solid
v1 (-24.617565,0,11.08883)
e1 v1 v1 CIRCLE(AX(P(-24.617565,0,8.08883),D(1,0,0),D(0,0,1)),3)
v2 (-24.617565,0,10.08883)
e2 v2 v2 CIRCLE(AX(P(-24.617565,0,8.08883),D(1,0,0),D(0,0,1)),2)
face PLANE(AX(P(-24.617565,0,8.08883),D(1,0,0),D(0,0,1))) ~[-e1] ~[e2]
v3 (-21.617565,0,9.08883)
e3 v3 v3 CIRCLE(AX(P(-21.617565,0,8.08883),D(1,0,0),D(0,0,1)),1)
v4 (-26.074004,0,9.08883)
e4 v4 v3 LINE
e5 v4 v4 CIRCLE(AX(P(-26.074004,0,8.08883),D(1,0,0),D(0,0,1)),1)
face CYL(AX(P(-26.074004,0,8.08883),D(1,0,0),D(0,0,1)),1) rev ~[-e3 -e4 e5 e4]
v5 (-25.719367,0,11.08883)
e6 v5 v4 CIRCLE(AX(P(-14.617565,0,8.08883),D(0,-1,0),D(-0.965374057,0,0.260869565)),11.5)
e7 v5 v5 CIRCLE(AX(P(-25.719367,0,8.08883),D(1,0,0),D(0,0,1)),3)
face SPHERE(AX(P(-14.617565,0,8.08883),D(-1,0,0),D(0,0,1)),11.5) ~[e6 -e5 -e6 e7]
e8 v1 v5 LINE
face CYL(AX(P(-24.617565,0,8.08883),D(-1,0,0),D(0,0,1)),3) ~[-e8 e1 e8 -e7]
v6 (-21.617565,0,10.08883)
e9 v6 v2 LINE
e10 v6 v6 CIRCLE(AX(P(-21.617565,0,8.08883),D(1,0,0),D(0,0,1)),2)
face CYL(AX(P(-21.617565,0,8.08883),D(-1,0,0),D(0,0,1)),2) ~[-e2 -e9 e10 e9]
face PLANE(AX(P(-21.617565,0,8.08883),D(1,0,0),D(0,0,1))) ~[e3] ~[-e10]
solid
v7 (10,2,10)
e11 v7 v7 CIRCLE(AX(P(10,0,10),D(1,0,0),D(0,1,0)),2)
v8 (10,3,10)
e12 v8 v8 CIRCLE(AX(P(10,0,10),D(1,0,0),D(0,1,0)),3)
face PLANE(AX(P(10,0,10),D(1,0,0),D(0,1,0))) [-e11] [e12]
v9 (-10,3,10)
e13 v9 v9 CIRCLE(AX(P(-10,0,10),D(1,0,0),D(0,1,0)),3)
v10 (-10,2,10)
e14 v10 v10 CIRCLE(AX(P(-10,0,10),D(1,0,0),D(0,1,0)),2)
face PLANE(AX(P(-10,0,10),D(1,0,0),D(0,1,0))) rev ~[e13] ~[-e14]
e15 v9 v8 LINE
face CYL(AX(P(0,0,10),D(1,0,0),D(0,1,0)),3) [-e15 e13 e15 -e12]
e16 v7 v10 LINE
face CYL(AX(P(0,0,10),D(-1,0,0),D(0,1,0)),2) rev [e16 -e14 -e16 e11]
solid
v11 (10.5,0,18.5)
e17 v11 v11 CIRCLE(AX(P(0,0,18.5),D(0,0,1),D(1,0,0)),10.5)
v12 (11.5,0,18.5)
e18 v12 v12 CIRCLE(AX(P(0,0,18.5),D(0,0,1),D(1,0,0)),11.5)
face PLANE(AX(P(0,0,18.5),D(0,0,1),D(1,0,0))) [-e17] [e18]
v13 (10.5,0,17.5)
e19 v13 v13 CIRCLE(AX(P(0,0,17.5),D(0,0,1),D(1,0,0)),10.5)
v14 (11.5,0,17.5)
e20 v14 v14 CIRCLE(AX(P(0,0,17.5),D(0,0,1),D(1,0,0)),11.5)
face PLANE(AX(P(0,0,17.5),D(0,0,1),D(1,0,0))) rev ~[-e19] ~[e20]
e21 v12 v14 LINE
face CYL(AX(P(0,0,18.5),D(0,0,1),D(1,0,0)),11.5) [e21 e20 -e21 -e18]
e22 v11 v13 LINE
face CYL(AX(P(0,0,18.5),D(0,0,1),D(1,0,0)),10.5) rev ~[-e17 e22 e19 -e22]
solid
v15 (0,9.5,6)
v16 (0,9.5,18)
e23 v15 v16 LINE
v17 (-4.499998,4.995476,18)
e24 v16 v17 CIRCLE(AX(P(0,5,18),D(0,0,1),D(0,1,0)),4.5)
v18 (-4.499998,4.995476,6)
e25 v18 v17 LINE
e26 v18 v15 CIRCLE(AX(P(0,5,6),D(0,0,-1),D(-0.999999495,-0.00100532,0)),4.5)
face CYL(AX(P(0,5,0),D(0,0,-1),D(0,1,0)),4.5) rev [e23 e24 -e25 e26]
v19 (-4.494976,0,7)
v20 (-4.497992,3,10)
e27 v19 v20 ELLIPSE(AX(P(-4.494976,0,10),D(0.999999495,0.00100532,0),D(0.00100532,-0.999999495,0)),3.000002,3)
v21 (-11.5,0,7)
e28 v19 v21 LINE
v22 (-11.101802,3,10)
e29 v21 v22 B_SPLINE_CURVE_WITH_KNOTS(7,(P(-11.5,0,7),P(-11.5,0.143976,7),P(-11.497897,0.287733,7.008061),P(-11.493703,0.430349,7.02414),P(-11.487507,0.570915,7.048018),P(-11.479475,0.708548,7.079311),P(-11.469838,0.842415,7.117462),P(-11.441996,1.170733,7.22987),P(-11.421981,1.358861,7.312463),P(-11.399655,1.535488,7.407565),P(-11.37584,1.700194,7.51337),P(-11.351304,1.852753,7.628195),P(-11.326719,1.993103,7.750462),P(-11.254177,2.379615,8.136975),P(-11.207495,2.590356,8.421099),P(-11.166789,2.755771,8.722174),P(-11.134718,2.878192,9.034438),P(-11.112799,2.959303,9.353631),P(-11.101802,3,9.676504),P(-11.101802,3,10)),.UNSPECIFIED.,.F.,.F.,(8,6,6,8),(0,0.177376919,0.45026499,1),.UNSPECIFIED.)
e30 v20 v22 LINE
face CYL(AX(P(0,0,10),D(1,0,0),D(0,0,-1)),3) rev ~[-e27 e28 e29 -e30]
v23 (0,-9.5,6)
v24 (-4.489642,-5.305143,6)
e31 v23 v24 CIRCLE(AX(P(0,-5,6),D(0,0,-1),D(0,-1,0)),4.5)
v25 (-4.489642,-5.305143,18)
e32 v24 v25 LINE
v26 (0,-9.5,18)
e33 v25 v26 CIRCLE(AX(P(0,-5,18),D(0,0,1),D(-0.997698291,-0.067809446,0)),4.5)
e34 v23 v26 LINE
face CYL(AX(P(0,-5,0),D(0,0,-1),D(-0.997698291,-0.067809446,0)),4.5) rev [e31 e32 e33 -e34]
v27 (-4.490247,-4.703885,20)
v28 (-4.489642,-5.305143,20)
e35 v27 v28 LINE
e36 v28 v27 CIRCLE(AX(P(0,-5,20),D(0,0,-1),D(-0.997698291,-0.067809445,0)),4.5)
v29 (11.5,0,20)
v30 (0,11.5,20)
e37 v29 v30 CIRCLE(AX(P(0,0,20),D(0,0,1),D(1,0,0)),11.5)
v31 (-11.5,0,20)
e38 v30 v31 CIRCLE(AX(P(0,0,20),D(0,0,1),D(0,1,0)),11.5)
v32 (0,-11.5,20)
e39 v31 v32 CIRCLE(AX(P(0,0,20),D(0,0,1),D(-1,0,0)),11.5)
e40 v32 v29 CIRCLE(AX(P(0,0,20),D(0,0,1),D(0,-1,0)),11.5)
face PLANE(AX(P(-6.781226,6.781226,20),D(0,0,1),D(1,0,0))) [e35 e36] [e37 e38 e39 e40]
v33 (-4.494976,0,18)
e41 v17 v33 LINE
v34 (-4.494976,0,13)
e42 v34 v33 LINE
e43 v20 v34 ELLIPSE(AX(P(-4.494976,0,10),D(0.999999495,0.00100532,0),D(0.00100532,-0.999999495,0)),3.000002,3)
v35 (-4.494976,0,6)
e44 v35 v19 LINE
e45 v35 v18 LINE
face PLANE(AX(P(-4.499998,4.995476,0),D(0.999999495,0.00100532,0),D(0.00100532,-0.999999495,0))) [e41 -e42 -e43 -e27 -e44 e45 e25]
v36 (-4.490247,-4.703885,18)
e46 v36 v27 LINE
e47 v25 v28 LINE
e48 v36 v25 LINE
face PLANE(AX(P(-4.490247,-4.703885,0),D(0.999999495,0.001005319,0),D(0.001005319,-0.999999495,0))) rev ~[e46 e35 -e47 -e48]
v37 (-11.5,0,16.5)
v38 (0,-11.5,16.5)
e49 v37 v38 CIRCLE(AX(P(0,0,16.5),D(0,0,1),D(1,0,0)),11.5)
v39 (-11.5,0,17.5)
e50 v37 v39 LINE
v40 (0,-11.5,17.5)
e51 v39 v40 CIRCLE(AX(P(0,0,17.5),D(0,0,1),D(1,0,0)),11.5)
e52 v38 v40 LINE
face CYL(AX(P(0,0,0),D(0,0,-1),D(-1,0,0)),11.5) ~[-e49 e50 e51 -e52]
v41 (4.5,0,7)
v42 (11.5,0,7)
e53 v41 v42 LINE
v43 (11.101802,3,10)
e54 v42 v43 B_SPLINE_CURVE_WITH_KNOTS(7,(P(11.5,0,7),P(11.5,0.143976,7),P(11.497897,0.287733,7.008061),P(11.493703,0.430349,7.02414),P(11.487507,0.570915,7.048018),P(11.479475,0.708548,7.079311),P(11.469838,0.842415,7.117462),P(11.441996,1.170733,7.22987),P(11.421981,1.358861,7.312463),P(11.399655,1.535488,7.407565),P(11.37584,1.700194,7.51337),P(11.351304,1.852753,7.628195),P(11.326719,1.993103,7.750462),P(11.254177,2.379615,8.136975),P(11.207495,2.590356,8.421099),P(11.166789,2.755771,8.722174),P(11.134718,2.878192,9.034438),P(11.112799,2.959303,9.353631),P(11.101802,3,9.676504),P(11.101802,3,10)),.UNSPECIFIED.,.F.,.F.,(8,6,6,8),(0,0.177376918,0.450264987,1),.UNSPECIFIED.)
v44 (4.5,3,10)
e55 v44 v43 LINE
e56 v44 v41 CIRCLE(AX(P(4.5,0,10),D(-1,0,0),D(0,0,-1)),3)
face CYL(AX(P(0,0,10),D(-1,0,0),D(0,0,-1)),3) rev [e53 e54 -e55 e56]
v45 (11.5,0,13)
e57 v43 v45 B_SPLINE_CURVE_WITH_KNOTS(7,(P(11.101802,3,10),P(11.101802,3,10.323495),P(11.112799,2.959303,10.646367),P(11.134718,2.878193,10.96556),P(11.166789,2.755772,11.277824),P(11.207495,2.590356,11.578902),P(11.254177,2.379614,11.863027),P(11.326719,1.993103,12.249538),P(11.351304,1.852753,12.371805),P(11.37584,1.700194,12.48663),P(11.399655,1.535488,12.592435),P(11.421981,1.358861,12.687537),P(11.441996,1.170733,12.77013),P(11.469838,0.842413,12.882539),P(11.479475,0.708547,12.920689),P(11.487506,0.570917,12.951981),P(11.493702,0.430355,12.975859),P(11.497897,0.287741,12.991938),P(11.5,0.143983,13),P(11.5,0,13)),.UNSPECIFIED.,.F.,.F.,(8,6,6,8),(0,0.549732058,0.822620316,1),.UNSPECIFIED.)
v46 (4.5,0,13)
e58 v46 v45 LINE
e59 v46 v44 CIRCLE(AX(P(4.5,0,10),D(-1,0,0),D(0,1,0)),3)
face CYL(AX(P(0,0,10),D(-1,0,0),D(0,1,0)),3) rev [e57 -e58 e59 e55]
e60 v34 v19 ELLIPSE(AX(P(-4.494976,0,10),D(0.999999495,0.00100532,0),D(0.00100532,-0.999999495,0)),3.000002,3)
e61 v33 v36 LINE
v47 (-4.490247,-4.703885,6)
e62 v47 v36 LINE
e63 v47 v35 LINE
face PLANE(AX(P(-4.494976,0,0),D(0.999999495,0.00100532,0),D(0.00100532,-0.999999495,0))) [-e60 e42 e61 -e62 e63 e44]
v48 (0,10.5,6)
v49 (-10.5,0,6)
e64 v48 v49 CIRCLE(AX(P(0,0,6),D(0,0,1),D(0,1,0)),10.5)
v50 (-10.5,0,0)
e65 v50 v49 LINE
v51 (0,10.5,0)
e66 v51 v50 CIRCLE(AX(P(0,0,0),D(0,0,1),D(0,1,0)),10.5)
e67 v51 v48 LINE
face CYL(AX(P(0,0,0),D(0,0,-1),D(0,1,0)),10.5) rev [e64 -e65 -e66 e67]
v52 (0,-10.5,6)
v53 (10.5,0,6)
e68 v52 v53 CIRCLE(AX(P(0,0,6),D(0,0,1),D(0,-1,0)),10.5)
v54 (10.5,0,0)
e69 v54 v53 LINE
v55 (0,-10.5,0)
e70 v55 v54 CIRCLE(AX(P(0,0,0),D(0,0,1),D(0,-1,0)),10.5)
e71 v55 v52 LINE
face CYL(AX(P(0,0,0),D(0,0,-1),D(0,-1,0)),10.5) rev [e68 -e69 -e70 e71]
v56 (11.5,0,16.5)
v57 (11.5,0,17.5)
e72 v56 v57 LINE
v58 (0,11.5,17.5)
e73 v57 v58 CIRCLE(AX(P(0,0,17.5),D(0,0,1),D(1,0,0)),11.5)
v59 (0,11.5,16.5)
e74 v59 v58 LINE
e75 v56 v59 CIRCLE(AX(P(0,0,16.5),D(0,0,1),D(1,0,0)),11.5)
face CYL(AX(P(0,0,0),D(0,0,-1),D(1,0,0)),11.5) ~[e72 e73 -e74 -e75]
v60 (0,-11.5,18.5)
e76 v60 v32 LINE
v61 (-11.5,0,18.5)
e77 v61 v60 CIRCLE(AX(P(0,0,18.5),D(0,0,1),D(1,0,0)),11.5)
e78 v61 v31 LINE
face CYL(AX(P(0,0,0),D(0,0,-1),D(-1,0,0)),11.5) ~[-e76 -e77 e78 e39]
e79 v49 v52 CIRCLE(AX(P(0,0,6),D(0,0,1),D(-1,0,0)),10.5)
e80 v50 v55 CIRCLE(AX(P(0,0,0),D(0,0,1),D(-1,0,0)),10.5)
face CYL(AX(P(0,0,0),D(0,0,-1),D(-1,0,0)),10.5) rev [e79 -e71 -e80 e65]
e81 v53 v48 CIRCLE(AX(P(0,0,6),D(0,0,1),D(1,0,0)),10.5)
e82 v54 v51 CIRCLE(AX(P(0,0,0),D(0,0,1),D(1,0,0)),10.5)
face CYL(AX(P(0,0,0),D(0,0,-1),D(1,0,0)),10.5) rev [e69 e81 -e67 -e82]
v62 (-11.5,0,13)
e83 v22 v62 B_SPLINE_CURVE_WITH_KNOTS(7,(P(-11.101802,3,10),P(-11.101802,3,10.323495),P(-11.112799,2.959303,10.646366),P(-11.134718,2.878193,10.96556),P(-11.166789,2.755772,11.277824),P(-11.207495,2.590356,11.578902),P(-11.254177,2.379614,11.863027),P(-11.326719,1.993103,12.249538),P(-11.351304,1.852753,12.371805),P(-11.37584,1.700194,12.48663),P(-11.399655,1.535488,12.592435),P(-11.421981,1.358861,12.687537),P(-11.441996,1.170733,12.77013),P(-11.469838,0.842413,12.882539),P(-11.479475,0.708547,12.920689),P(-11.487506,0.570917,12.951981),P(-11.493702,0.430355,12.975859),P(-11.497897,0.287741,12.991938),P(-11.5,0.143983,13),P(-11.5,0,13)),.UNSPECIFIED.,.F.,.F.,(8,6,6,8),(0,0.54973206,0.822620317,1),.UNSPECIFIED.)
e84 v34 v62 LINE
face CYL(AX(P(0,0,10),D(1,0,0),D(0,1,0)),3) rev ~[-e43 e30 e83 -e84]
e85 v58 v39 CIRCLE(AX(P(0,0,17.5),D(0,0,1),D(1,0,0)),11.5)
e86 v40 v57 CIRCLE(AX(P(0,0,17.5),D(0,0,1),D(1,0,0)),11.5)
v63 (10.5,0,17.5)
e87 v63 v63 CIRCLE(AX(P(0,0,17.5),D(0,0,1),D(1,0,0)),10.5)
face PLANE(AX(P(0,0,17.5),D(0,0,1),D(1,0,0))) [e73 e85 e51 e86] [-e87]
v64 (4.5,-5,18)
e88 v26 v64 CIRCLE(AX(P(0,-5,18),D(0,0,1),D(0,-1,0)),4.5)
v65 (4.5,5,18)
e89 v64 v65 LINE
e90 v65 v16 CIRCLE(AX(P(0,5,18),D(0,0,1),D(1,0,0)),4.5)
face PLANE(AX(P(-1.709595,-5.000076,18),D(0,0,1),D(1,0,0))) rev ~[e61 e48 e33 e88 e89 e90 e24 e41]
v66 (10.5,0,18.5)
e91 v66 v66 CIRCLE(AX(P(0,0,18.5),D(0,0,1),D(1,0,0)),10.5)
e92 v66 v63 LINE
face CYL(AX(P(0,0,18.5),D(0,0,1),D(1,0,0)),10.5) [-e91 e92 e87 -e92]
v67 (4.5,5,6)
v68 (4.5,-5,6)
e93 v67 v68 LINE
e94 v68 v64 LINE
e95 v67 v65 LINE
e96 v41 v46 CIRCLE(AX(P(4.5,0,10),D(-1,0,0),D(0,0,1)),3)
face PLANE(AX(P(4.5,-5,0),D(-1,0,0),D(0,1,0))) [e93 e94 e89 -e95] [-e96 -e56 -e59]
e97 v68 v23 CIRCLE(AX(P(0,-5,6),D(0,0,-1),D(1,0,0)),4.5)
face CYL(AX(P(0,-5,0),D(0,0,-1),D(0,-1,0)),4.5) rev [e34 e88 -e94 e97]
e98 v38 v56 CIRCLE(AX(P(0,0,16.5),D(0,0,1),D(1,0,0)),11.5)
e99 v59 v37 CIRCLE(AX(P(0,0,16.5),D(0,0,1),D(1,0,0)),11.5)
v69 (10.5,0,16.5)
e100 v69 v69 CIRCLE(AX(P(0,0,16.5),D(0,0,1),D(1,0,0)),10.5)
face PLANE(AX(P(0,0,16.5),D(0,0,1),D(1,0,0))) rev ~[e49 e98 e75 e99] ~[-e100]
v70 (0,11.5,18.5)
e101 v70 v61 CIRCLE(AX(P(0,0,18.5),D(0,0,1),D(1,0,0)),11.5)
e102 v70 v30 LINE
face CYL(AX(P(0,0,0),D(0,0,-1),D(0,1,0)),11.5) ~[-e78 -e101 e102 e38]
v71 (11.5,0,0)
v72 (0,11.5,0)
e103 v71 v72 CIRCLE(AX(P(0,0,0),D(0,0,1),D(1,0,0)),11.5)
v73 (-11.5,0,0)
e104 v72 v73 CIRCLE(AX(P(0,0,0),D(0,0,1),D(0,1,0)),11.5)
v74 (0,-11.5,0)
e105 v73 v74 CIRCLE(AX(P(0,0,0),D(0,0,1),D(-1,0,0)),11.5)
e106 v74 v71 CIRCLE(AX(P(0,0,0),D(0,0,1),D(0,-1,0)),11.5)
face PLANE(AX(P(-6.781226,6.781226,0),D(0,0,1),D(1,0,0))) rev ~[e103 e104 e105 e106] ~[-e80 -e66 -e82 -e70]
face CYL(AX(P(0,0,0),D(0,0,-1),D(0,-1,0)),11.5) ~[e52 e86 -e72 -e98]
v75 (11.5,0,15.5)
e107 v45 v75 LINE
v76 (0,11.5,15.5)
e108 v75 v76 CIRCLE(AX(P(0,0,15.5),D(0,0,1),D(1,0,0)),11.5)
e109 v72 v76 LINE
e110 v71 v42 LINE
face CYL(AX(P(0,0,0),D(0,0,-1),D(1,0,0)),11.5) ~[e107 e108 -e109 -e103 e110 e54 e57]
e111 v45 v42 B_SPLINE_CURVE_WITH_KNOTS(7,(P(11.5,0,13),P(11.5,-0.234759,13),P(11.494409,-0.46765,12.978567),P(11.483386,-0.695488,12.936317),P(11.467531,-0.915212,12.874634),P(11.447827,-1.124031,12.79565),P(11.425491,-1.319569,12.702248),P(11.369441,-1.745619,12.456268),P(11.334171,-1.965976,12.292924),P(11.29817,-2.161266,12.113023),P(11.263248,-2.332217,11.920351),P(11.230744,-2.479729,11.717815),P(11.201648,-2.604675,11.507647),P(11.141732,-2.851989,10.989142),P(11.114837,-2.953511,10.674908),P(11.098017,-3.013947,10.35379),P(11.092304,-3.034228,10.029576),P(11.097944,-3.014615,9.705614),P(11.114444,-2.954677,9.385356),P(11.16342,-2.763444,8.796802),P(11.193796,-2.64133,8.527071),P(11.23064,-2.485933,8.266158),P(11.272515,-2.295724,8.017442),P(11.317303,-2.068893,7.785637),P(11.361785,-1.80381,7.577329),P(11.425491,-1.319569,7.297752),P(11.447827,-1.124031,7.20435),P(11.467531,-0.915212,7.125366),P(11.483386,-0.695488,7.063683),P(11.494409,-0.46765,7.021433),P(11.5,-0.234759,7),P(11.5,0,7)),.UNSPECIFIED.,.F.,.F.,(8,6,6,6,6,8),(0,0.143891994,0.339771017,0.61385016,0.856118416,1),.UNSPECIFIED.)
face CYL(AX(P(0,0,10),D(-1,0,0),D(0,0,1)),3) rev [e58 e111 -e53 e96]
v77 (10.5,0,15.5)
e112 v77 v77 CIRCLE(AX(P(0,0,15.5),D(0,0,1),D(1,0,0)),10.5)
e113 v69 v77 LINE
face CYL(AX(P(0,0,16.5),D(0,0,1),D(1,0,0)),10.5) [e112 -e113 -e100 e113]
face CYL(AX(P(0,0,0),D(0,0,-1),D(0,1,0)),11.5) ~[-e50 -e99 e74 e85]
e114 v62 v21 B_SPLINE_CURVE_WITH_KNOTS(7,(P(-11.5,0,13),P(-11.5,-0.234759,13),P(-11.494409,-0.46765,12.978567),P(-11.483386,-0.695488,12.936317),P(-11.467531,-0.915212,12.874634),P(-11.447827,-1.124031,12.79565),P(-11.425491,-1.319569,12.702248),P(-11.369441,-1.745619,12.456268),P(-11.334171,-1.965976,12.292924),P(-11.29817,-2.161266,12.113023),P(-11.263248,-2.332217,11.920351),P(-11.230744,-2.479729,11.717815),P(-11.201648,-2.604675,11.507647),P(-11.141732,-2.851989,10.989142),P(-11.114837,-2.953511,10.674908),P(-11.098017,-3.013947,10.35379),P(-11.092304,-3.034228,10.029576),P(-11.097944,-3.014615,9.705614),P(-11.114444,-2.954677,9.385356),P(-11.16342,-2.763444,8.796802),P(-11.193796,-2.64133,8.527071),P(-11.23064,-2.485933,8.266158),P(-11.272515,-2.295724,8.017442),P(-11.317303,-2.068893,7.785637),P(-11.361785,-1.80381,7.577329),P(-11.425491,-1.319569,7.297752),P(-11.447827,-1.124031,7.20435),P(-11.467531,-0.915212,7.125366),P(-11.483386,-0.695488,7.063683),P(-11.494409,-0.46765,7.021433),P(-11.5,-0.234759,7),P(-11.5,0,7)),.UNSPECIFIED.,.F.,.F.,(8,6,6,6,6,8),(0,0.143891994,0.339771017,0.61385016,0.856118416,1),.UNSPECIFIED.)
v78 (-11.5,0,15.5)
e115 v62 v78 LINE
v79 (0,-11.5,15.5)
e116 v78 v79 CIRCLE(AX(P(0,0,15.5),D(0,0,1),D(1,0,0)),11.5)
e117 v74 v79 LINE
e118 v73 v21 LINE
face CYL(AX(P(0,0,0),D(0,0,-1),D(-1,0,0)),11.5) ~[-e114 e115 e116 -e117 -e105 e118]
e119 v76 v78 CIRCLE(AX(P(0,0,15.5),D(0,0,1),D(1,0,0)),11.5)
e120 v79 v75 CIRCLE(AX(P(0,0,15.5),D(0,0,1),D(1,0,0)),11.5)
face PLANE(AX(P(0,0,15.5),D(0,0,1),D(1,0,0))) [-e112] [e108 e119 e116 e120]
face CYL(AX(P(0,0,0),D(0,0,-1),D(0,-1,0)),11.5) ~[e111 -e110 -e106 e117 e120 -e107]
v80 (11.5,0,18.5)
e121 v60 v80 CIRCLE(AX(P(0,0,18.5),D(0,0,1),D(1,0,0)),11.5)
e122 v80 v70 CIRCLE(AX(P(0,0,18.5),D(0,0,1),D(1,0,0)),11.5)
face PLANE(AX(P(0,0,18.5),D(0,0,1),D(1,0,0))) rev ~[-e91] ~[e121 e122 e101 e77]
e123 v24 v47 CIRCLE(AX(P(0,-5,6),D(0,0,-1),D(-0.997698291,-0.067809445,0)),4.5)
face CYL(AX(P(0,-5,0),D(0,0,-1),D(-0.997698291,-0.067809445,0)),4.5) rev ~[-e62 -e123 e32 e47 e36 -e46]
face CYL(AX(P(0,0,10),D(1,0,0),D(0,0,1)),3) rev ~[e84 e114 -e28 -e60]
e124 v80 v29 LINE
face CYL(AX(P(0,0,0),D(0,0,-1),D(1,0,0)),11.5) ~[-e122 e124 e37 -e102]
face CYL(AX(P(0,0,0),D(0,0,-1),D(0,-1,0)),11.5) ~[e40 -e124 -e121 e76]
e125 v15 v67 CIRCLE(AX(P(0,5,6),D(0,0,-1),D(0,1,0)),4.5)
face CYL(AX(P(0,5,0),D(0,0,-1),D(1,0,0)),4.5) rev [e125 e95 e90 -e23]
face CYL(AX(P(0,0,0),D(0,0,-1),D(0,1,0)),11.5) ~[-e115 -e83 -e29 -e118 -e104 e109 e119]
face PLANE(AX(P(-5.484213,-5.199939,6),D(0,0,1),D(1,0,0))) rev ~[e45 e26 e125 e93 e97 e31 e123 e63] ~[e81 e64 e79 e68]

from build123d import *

# Parameters (mm, degrees)
F1_DEPTH  = 20
F2_DEPTH  = 18
F3_DEPTH  = 6
F5_DEPTH  = 12.5
F7_R      = 11.5
F7_R_2    = 10.5
F8_DEPTH  = 1
F10_R     = 11.5
F10_R_2   = 10.5
F11_DEPTH = 1
F12_DEPTH = 1
F13_R     = 3
F13_R_2   = 2
F14_DEPTH = 10


with BuildPart() as f1:
    # F0 (on Top) → F1 (new body)
    with BuildSketch(Plane.XY):
        with BuildLine():
            Line((0, 10.5), (0, 11.5))
            ThreePointArc((0, 11.5), (-8.1317279836, 8.1317279836), (-11.5, 0))
            Line((-11.5, 0), (-10.5, 0))
            ThreePointArc((-10.5, 0), (-7.4246212025, 7.4246212025), (0, 10.5))
        make_face()
        with BuildLine():
            Line((0, 9.5), (0, 10.5))
            ThreePointArc((0, 10.5), (-7.4246212025, 7.4246212025), (-10.5, 0))
            Line((-10.5, 0), (-4.4949756738, 0))
            Line((-4.4949756738, 0), (-4.499997726, 4.9954760621))
            ThreePointArc((-4.499997726, 4.9954760621), (-3.1835795671, 8.1803806596), (0, 9.5))
        make_face()
        with BuildLine():
            Line((-4.4949756738, 0), (0, 0))
            Line((0, 0), (0, 0.5))
            ThreePointArc((0, 0.5), (-3.1803806596, 1.8164204329), (-4.499997726, 4.9954760621))
            Line((-4.499997726, 4.9954760621), (-4.4949756738, 0))
        make_face()
        with BuildLine():
            Line((0, 0.5), (0, 9.5))
            ThreePointArc((0, 9.5), (-3.1835795671, 8.1803806596), (-4.499997726, 4.9954760621))
            ThreePointArc((-4.499997726, 4.9954760621), (-3.1803806596, 1.8164204329), (0, 0.5))
        make_face()
        with BuildLine():
            ThreePointArc((4.5, 5), (3.1819805153, 8.1819805153), (0, 9.5))
            Line((0, 9.5), (0, 0.5))
            ThreePointArc((0, 0.5), (3.1819805153, 1.8180194847), (4.5, 5))
        make_face()
        with BuildLine():
            Line((10.5, 0), (11.5, 0))
            ThreePointArc((11.5, 0), (8.1317279836, 8.1317279836), (0, 11.5))
            Line((0, 11.5), (0, 10.5))
            ThreePointArc((0, 10.5), (7.4246212025, 7.4246212025), (10.5, 0))
        make_face()
        with BuildLine():
            Line((4.5, -5), (4.5, 0))
            Line((4.5, 0), (0, 0))
            Line((0, 0), (0, -0.5))
            ThreePointArc((0, -0.5), (3.1819805153, -1.8180194847), (4.5, -5))
        make_face()
        with BuildLine():
            ThreePointArc((0, -10.5), (7.4246212025, -7.4246212025), (10.5, 0))
            Line((10.5, 0), (4.5, 0))
            Line((4.5, 0), (4.5, -5))
            ThreePointArc((4.5, -5), (3.1819805153, -8.1819805153), (0, -9.5))
            Line((0, -9.5), (0, -10.5))
        make_face()
        with BuildLine():
            ThreePointArc((-11.5, 0), (-8.1317279836, -8.1317279836), (0, -11.5))
            Line((0, -11.5), (0, -10.5))
            ThreePointArc((0, -10.5), (-7.4246212025, -7.4246212025), (-10.5, 0))
            Line((-10.5, 0), (-11.5, 0))
        make_face()
        with BuildLine():
            ThreePointArc((-10.5, 0), (-7.4246212025, -7.4246212025), (0, -10.5))
            Line((0, -10.5), (0, -9.5))
            ThreePointArc((0, -9.5), (-3.0722026892, -8.28809529), (-4.4896423078, -5.3051425051))
            ThreePointArc((-4.4896423078, -5.3051425051), (-4.499997726, -5.0045239379), (-4.4902467638, -4.7038851573))
            Line((-4.4902467638, -4.7038851573), (-4.4949756738, 0))
            Line((-4.4949756738, 0), (-10.5, 0))
        make_face()
        with BuildLine():
            Line((0, -0.5), (0, 0))
            Line((0, 0), (-4.4949756738, 0))
            Line((-4.4949756738, 0), (-4.4902467638, -4.7038851573))
            ThreePointArc((-4.4902467638, -4.7038851573), (-3.0755067231, -1.7149949169), (0, -0.5))
        make_face()
        with BuildLine():
            ThreePointArc((-4.4896423078, -5.3051425051), (-3.0722026892, -8.28809529), (0, -9.5))
            Line((0, -9.5), (0, -0.5))
            ThreePointArc((0, -0.5), (-3.0755067231, -1.7149949169), (-4.4902467638, -4.7038851573))
            Line((-4.4902467638, -4.7038851573), (-4.4896423078, -5.3051425051))
        make_face()
        with BuildLine():
            Line((0, -0.5), (0, -9.5))
            ThreePointArc((0, -9.5), (3.1819805153, -8.1819805153), (4.5, -5))
            ThreePointArc((4.5, -5), (3.1819805153, -1.8180194847), (0, -0.5))
        make_face()
        with BuildLine():
            ThreePointArc((0, -11.5), (8.1317279836, -8.1317279836), (11.5, 0))
            Line((11.5, 0), (10.5, 0))
            ThreePointArc((10.5, 0), (7.4246212025, -7.4246212025), (0, -10.5))
            Line((0, -10.5), (0, -11.5))
        make_face()
        with BuildLine():
            Line((4.5, 0), (10.5, 0))
            ThreePointArc((10.5, 0), (7.4246212025, 7.4246212025), (0, 10.5))
            Line((0, 10.5), (0, 9.5))
            ThreePointArc((0, 9.5), (3.1819805153, 8.1819805153), (4.5, 5))
            Line((4.5, 5), (4.5, 0))
        make_face()
        with BuildLine():
            Line((0, 0), (4.5, 0))
            Line((4.5, 0), (4.5, 5))
            ThreePointArc((4.5, 5), (3.1819805153, 1.8180194847), (0, 0.5))
            Line((0, 0.5), (0, 0))
        make_face()
    extrude(amount=F1_DEPTH)

    # F0 (on Top) → F2 (cut)
    with BuildSketch(Plane.XY):
        with BuildLine():
            ThreePointArc((-4.4896423078, -5.3051425051), (-3.0722026892, -8.28809529), (0, -9.5))
            Line((0, -9.5), (0, -0.5))
            ThreePointArc((0, -0.5), (-3.0755067231, -1.7149949169), (-4.4902467638, -4.7038851573))
            Line((-4.4902467638, -4.7038851573), (-4.4896423078, -5.3051425051))
        make_face()
        with BuildLine():
            Line((0, -0.5), (0, -9.5))
            ThreePointArc((0, -9.5), (3.1819805153, -8.1819805153), (4.5, -5))
            ThreePointArc((4.5, -5), (3.1819805153, -1.8180194847), (0, -0.5))
        make_face()
        with BuildLine():
            Line((4.5, -5), (4.5, 0))
            Line((4.5, 0), (0, 0))
            Line((0, 0), (0, -0.5))
            ThreePointArc((0, -0.5), (3.1819805153, -1.8180194847), (4.5, -5))
        make_face()
        with BuildLine():
            Line((0, 0), (4.5, 0))
            Line((4.5, 0), (4.5, 5))
            ThreePointArc((4.5, 5), (3.1819805153, 1.8180194847), (0, 0.5))
            Line((0, 0.5), (0, 0))
        make_face()
        with BuildLine():
            ThreePointArc((4.5, 5), (3.1819805153, 8.1819805153), (0, 9.5))
            Line((0, 9.5), (0, 0.5))
            ThreePointArc((0, 0.5), (3.1819805153, 1.8180194847), (4.5, 5))
        make_face()
        with BuildLine():
            Line((0, 0.5), (0, 9.5))
            ThreePointArc((0, 9.5), (-3.1835795671, 8.1803806596), (-4.499997726, 4.9954760621))
            ThreePointArc((-4.499997726, 4.9954760621), (-3.1803806596, 1.8164204329), (0, 0.5))
        make_face()
        with BuildLine():
            Line((0, -0.5), (0, 0))
            Line((0, 0), (-4.4949756738, 0))
            Line((-4.4949756738, 0), (-4.4902467638, -4.7038851573))
            ThreePointArc((-4.4902467638, -4.7038851573), (-3.0755067231, -1.7149949169), (0, -0.5))
        make_face()
        with BuildLine():
            Line((-4.4949756738, 0), (0, 0))
            Line((0, 0), (0, 0.5))
            ThreePointArc((0, 0.5), (-3.1803806596, 1.8164204329), (-4.499997726, 4.9954760621))
            Line((-4.499997726, 4.9954760621), (-4.4949756738, 0))
        make_face()
    extrude(amount=F2_DEPTH, mode=Mode.SUBTRACT)

    # F0 (on Top) → F3 (cut)
    with BuildSketch(Plane.XY):
        with BuildLine():
            ThreePointArc((-10.5, 0), (-7.4246212025, -7.4246212025), (0, -10.5))
            Line((0, -10.5), (0, -9.5))
            ThreePointArc((0, -9.5), (-3.0722026892, -8.28809529), (-4.4896423078, -5.3051425051))
            ThreePointArc((-4.4896423078, -5.3051425051), (-4.499997726, -5.0045239379), (-4.4902467638, -4.7038851573))
            Line((-4.4902467638, -4.7038851573), (-4.4949756738, 0))
            Line((-4.4949756738, 0), (-10.5, 0))
        make_face()
        with BuildLine():
            ThreePointArc((0, -10.5), (7.4246212025, -7.4246212025), (10.5, 0))
            Line((10.5, 0), (4.5, 0))
            Line((4.5, 0), (4.5, -5))
            ThreePointArc((4.5, -5), (3.1819805153, -8.1819805153), (0, -9.5))
            Line((0, -9.5), (0, -10.5))
        make_face()
        with BuildLine():
            Line((4.5, 0), (10.5, 0))
            ThreePointArc((10.5, 0), (7.4246212025, 7.4246212025), (0, 10.5))
            Line((0, 10.5), (0, 9.5))
            ThreePointArc((0, 9.5), (3.1819805153, 8.1819805153), (4.5, 5))
            Line((4.5, 5), (4.5, 0))
        make_face()
        with BuildLine():
            Line((0, 9.5), (0, 10.5))
            ThreePointArc((0, 10.5), (-7.4246212025, 7.4246212025), (-10.5, 0))
            Line((-10.5, 0), (-4.4949756738, 0))
            Line((-4.4949756738, 0), (-4.499997726, 4.9954760621))
            ThreePointArc((-4.499997726, 4.9954760621), (-3.1835795671, 8.1803806596), (0, 9.5))
        make_face()
    extrude(amount=F3_DEPTH, mode=Mode.SUBTRACT)

    # F4 (on Right) → F5 (cut, symmetric)
    with BuildSketch(Plane.YZ):
        with BuildLine():
            ThreePointArc((3, 10), (2.1213203436, 12.1213203436), (0, 13))
            Line((0, 13), (0, 7))
            ThreePointArc((0, 7), (2.1213203436, 7.8786796564), (3, 10))
        make_face()
        with BuildLine():
            Line((0, 7), (0, 13))
            ThreePointArc((0, 13), (-3, 10), (0, 7))
        make_face()
    extrude(amount=F5_DEPTH, both=True, mode=Mode.SUBTRACT)

    # F7 (on offset) → F8 (cut)
    with BuildSketch(Plane.XY.offset(18.5)):
        Circle(F7_R)
        Circle(F7_R_2, mode=Mode.SUBTRACT)
    extrude(amount=-F8_DEPTH, mode=Mode.SUBTRACT)

    # F10 (on offset) → F11 (cut)
    with BuildSketch(Plane.XY.offset(16.5)):
        Circle(F10_R)
        Circle(F10_R_2, mode=Mode.SUBTRACT)
    extrude(amount=-F11_DEPTH, mode=Mode.SUBTRACT)


with BuildPart() as f12:
    # F7 (on offset) → F12 (new body)
    with BuildSketch(Plane.XY.offset(18.5)):
        Circle(F7_R)
        Circle(F7_R_2, mode=Mode.SUBTRACT)
    extrude(amount=-F12_DEPTH)


with BuildPart() as f14:
    # F13 (on face) → F14 (new body, symmetric)
    with BuildSketch(Plane.YZ):
        with Locations((0, 10)):
            Circle(F13_R)
        with Locations((0, 10)):
            Circle(F13_R_2, mode=Mode.SUBTRACT)
    extrude(amount=F14_DEPTH, both=True)


with BuildPart() as f16:
    # F15 (on Front) → F16 (revolve)
    with BuildSketch(Plane.XZ):
        with BuildLine():
            Line((-26.0740043477, 9.0888299271), (-21.6175651103, 9.0888299271))
            Line((-21.6175651103, 9.0888299271), (-21.6175651103, 10.0888299271))
            Line((-21.6175651103, 10.0888299271), (-24.6175651103, 10.0888299271))
            Line((-24.6175651103, 10.0888299271), (-24.6175651103, 11.0888299271))
            Line((-24.6175651103, 11.0888299271), (-25.7193667659, 11.0888299271))
            ThreePointArc((-25.7193667659, 11.0888299271), (-25.940928482, 10.0966750291), (-26.0740043477, 9.0888299271))
        make_face()
    revolve(axis=Axis((-20.3675651103, 0, 8.0888299271), (1, 0, 0)))


solid = Compound([f1.part, f12.part, f14.part, f16.part])
